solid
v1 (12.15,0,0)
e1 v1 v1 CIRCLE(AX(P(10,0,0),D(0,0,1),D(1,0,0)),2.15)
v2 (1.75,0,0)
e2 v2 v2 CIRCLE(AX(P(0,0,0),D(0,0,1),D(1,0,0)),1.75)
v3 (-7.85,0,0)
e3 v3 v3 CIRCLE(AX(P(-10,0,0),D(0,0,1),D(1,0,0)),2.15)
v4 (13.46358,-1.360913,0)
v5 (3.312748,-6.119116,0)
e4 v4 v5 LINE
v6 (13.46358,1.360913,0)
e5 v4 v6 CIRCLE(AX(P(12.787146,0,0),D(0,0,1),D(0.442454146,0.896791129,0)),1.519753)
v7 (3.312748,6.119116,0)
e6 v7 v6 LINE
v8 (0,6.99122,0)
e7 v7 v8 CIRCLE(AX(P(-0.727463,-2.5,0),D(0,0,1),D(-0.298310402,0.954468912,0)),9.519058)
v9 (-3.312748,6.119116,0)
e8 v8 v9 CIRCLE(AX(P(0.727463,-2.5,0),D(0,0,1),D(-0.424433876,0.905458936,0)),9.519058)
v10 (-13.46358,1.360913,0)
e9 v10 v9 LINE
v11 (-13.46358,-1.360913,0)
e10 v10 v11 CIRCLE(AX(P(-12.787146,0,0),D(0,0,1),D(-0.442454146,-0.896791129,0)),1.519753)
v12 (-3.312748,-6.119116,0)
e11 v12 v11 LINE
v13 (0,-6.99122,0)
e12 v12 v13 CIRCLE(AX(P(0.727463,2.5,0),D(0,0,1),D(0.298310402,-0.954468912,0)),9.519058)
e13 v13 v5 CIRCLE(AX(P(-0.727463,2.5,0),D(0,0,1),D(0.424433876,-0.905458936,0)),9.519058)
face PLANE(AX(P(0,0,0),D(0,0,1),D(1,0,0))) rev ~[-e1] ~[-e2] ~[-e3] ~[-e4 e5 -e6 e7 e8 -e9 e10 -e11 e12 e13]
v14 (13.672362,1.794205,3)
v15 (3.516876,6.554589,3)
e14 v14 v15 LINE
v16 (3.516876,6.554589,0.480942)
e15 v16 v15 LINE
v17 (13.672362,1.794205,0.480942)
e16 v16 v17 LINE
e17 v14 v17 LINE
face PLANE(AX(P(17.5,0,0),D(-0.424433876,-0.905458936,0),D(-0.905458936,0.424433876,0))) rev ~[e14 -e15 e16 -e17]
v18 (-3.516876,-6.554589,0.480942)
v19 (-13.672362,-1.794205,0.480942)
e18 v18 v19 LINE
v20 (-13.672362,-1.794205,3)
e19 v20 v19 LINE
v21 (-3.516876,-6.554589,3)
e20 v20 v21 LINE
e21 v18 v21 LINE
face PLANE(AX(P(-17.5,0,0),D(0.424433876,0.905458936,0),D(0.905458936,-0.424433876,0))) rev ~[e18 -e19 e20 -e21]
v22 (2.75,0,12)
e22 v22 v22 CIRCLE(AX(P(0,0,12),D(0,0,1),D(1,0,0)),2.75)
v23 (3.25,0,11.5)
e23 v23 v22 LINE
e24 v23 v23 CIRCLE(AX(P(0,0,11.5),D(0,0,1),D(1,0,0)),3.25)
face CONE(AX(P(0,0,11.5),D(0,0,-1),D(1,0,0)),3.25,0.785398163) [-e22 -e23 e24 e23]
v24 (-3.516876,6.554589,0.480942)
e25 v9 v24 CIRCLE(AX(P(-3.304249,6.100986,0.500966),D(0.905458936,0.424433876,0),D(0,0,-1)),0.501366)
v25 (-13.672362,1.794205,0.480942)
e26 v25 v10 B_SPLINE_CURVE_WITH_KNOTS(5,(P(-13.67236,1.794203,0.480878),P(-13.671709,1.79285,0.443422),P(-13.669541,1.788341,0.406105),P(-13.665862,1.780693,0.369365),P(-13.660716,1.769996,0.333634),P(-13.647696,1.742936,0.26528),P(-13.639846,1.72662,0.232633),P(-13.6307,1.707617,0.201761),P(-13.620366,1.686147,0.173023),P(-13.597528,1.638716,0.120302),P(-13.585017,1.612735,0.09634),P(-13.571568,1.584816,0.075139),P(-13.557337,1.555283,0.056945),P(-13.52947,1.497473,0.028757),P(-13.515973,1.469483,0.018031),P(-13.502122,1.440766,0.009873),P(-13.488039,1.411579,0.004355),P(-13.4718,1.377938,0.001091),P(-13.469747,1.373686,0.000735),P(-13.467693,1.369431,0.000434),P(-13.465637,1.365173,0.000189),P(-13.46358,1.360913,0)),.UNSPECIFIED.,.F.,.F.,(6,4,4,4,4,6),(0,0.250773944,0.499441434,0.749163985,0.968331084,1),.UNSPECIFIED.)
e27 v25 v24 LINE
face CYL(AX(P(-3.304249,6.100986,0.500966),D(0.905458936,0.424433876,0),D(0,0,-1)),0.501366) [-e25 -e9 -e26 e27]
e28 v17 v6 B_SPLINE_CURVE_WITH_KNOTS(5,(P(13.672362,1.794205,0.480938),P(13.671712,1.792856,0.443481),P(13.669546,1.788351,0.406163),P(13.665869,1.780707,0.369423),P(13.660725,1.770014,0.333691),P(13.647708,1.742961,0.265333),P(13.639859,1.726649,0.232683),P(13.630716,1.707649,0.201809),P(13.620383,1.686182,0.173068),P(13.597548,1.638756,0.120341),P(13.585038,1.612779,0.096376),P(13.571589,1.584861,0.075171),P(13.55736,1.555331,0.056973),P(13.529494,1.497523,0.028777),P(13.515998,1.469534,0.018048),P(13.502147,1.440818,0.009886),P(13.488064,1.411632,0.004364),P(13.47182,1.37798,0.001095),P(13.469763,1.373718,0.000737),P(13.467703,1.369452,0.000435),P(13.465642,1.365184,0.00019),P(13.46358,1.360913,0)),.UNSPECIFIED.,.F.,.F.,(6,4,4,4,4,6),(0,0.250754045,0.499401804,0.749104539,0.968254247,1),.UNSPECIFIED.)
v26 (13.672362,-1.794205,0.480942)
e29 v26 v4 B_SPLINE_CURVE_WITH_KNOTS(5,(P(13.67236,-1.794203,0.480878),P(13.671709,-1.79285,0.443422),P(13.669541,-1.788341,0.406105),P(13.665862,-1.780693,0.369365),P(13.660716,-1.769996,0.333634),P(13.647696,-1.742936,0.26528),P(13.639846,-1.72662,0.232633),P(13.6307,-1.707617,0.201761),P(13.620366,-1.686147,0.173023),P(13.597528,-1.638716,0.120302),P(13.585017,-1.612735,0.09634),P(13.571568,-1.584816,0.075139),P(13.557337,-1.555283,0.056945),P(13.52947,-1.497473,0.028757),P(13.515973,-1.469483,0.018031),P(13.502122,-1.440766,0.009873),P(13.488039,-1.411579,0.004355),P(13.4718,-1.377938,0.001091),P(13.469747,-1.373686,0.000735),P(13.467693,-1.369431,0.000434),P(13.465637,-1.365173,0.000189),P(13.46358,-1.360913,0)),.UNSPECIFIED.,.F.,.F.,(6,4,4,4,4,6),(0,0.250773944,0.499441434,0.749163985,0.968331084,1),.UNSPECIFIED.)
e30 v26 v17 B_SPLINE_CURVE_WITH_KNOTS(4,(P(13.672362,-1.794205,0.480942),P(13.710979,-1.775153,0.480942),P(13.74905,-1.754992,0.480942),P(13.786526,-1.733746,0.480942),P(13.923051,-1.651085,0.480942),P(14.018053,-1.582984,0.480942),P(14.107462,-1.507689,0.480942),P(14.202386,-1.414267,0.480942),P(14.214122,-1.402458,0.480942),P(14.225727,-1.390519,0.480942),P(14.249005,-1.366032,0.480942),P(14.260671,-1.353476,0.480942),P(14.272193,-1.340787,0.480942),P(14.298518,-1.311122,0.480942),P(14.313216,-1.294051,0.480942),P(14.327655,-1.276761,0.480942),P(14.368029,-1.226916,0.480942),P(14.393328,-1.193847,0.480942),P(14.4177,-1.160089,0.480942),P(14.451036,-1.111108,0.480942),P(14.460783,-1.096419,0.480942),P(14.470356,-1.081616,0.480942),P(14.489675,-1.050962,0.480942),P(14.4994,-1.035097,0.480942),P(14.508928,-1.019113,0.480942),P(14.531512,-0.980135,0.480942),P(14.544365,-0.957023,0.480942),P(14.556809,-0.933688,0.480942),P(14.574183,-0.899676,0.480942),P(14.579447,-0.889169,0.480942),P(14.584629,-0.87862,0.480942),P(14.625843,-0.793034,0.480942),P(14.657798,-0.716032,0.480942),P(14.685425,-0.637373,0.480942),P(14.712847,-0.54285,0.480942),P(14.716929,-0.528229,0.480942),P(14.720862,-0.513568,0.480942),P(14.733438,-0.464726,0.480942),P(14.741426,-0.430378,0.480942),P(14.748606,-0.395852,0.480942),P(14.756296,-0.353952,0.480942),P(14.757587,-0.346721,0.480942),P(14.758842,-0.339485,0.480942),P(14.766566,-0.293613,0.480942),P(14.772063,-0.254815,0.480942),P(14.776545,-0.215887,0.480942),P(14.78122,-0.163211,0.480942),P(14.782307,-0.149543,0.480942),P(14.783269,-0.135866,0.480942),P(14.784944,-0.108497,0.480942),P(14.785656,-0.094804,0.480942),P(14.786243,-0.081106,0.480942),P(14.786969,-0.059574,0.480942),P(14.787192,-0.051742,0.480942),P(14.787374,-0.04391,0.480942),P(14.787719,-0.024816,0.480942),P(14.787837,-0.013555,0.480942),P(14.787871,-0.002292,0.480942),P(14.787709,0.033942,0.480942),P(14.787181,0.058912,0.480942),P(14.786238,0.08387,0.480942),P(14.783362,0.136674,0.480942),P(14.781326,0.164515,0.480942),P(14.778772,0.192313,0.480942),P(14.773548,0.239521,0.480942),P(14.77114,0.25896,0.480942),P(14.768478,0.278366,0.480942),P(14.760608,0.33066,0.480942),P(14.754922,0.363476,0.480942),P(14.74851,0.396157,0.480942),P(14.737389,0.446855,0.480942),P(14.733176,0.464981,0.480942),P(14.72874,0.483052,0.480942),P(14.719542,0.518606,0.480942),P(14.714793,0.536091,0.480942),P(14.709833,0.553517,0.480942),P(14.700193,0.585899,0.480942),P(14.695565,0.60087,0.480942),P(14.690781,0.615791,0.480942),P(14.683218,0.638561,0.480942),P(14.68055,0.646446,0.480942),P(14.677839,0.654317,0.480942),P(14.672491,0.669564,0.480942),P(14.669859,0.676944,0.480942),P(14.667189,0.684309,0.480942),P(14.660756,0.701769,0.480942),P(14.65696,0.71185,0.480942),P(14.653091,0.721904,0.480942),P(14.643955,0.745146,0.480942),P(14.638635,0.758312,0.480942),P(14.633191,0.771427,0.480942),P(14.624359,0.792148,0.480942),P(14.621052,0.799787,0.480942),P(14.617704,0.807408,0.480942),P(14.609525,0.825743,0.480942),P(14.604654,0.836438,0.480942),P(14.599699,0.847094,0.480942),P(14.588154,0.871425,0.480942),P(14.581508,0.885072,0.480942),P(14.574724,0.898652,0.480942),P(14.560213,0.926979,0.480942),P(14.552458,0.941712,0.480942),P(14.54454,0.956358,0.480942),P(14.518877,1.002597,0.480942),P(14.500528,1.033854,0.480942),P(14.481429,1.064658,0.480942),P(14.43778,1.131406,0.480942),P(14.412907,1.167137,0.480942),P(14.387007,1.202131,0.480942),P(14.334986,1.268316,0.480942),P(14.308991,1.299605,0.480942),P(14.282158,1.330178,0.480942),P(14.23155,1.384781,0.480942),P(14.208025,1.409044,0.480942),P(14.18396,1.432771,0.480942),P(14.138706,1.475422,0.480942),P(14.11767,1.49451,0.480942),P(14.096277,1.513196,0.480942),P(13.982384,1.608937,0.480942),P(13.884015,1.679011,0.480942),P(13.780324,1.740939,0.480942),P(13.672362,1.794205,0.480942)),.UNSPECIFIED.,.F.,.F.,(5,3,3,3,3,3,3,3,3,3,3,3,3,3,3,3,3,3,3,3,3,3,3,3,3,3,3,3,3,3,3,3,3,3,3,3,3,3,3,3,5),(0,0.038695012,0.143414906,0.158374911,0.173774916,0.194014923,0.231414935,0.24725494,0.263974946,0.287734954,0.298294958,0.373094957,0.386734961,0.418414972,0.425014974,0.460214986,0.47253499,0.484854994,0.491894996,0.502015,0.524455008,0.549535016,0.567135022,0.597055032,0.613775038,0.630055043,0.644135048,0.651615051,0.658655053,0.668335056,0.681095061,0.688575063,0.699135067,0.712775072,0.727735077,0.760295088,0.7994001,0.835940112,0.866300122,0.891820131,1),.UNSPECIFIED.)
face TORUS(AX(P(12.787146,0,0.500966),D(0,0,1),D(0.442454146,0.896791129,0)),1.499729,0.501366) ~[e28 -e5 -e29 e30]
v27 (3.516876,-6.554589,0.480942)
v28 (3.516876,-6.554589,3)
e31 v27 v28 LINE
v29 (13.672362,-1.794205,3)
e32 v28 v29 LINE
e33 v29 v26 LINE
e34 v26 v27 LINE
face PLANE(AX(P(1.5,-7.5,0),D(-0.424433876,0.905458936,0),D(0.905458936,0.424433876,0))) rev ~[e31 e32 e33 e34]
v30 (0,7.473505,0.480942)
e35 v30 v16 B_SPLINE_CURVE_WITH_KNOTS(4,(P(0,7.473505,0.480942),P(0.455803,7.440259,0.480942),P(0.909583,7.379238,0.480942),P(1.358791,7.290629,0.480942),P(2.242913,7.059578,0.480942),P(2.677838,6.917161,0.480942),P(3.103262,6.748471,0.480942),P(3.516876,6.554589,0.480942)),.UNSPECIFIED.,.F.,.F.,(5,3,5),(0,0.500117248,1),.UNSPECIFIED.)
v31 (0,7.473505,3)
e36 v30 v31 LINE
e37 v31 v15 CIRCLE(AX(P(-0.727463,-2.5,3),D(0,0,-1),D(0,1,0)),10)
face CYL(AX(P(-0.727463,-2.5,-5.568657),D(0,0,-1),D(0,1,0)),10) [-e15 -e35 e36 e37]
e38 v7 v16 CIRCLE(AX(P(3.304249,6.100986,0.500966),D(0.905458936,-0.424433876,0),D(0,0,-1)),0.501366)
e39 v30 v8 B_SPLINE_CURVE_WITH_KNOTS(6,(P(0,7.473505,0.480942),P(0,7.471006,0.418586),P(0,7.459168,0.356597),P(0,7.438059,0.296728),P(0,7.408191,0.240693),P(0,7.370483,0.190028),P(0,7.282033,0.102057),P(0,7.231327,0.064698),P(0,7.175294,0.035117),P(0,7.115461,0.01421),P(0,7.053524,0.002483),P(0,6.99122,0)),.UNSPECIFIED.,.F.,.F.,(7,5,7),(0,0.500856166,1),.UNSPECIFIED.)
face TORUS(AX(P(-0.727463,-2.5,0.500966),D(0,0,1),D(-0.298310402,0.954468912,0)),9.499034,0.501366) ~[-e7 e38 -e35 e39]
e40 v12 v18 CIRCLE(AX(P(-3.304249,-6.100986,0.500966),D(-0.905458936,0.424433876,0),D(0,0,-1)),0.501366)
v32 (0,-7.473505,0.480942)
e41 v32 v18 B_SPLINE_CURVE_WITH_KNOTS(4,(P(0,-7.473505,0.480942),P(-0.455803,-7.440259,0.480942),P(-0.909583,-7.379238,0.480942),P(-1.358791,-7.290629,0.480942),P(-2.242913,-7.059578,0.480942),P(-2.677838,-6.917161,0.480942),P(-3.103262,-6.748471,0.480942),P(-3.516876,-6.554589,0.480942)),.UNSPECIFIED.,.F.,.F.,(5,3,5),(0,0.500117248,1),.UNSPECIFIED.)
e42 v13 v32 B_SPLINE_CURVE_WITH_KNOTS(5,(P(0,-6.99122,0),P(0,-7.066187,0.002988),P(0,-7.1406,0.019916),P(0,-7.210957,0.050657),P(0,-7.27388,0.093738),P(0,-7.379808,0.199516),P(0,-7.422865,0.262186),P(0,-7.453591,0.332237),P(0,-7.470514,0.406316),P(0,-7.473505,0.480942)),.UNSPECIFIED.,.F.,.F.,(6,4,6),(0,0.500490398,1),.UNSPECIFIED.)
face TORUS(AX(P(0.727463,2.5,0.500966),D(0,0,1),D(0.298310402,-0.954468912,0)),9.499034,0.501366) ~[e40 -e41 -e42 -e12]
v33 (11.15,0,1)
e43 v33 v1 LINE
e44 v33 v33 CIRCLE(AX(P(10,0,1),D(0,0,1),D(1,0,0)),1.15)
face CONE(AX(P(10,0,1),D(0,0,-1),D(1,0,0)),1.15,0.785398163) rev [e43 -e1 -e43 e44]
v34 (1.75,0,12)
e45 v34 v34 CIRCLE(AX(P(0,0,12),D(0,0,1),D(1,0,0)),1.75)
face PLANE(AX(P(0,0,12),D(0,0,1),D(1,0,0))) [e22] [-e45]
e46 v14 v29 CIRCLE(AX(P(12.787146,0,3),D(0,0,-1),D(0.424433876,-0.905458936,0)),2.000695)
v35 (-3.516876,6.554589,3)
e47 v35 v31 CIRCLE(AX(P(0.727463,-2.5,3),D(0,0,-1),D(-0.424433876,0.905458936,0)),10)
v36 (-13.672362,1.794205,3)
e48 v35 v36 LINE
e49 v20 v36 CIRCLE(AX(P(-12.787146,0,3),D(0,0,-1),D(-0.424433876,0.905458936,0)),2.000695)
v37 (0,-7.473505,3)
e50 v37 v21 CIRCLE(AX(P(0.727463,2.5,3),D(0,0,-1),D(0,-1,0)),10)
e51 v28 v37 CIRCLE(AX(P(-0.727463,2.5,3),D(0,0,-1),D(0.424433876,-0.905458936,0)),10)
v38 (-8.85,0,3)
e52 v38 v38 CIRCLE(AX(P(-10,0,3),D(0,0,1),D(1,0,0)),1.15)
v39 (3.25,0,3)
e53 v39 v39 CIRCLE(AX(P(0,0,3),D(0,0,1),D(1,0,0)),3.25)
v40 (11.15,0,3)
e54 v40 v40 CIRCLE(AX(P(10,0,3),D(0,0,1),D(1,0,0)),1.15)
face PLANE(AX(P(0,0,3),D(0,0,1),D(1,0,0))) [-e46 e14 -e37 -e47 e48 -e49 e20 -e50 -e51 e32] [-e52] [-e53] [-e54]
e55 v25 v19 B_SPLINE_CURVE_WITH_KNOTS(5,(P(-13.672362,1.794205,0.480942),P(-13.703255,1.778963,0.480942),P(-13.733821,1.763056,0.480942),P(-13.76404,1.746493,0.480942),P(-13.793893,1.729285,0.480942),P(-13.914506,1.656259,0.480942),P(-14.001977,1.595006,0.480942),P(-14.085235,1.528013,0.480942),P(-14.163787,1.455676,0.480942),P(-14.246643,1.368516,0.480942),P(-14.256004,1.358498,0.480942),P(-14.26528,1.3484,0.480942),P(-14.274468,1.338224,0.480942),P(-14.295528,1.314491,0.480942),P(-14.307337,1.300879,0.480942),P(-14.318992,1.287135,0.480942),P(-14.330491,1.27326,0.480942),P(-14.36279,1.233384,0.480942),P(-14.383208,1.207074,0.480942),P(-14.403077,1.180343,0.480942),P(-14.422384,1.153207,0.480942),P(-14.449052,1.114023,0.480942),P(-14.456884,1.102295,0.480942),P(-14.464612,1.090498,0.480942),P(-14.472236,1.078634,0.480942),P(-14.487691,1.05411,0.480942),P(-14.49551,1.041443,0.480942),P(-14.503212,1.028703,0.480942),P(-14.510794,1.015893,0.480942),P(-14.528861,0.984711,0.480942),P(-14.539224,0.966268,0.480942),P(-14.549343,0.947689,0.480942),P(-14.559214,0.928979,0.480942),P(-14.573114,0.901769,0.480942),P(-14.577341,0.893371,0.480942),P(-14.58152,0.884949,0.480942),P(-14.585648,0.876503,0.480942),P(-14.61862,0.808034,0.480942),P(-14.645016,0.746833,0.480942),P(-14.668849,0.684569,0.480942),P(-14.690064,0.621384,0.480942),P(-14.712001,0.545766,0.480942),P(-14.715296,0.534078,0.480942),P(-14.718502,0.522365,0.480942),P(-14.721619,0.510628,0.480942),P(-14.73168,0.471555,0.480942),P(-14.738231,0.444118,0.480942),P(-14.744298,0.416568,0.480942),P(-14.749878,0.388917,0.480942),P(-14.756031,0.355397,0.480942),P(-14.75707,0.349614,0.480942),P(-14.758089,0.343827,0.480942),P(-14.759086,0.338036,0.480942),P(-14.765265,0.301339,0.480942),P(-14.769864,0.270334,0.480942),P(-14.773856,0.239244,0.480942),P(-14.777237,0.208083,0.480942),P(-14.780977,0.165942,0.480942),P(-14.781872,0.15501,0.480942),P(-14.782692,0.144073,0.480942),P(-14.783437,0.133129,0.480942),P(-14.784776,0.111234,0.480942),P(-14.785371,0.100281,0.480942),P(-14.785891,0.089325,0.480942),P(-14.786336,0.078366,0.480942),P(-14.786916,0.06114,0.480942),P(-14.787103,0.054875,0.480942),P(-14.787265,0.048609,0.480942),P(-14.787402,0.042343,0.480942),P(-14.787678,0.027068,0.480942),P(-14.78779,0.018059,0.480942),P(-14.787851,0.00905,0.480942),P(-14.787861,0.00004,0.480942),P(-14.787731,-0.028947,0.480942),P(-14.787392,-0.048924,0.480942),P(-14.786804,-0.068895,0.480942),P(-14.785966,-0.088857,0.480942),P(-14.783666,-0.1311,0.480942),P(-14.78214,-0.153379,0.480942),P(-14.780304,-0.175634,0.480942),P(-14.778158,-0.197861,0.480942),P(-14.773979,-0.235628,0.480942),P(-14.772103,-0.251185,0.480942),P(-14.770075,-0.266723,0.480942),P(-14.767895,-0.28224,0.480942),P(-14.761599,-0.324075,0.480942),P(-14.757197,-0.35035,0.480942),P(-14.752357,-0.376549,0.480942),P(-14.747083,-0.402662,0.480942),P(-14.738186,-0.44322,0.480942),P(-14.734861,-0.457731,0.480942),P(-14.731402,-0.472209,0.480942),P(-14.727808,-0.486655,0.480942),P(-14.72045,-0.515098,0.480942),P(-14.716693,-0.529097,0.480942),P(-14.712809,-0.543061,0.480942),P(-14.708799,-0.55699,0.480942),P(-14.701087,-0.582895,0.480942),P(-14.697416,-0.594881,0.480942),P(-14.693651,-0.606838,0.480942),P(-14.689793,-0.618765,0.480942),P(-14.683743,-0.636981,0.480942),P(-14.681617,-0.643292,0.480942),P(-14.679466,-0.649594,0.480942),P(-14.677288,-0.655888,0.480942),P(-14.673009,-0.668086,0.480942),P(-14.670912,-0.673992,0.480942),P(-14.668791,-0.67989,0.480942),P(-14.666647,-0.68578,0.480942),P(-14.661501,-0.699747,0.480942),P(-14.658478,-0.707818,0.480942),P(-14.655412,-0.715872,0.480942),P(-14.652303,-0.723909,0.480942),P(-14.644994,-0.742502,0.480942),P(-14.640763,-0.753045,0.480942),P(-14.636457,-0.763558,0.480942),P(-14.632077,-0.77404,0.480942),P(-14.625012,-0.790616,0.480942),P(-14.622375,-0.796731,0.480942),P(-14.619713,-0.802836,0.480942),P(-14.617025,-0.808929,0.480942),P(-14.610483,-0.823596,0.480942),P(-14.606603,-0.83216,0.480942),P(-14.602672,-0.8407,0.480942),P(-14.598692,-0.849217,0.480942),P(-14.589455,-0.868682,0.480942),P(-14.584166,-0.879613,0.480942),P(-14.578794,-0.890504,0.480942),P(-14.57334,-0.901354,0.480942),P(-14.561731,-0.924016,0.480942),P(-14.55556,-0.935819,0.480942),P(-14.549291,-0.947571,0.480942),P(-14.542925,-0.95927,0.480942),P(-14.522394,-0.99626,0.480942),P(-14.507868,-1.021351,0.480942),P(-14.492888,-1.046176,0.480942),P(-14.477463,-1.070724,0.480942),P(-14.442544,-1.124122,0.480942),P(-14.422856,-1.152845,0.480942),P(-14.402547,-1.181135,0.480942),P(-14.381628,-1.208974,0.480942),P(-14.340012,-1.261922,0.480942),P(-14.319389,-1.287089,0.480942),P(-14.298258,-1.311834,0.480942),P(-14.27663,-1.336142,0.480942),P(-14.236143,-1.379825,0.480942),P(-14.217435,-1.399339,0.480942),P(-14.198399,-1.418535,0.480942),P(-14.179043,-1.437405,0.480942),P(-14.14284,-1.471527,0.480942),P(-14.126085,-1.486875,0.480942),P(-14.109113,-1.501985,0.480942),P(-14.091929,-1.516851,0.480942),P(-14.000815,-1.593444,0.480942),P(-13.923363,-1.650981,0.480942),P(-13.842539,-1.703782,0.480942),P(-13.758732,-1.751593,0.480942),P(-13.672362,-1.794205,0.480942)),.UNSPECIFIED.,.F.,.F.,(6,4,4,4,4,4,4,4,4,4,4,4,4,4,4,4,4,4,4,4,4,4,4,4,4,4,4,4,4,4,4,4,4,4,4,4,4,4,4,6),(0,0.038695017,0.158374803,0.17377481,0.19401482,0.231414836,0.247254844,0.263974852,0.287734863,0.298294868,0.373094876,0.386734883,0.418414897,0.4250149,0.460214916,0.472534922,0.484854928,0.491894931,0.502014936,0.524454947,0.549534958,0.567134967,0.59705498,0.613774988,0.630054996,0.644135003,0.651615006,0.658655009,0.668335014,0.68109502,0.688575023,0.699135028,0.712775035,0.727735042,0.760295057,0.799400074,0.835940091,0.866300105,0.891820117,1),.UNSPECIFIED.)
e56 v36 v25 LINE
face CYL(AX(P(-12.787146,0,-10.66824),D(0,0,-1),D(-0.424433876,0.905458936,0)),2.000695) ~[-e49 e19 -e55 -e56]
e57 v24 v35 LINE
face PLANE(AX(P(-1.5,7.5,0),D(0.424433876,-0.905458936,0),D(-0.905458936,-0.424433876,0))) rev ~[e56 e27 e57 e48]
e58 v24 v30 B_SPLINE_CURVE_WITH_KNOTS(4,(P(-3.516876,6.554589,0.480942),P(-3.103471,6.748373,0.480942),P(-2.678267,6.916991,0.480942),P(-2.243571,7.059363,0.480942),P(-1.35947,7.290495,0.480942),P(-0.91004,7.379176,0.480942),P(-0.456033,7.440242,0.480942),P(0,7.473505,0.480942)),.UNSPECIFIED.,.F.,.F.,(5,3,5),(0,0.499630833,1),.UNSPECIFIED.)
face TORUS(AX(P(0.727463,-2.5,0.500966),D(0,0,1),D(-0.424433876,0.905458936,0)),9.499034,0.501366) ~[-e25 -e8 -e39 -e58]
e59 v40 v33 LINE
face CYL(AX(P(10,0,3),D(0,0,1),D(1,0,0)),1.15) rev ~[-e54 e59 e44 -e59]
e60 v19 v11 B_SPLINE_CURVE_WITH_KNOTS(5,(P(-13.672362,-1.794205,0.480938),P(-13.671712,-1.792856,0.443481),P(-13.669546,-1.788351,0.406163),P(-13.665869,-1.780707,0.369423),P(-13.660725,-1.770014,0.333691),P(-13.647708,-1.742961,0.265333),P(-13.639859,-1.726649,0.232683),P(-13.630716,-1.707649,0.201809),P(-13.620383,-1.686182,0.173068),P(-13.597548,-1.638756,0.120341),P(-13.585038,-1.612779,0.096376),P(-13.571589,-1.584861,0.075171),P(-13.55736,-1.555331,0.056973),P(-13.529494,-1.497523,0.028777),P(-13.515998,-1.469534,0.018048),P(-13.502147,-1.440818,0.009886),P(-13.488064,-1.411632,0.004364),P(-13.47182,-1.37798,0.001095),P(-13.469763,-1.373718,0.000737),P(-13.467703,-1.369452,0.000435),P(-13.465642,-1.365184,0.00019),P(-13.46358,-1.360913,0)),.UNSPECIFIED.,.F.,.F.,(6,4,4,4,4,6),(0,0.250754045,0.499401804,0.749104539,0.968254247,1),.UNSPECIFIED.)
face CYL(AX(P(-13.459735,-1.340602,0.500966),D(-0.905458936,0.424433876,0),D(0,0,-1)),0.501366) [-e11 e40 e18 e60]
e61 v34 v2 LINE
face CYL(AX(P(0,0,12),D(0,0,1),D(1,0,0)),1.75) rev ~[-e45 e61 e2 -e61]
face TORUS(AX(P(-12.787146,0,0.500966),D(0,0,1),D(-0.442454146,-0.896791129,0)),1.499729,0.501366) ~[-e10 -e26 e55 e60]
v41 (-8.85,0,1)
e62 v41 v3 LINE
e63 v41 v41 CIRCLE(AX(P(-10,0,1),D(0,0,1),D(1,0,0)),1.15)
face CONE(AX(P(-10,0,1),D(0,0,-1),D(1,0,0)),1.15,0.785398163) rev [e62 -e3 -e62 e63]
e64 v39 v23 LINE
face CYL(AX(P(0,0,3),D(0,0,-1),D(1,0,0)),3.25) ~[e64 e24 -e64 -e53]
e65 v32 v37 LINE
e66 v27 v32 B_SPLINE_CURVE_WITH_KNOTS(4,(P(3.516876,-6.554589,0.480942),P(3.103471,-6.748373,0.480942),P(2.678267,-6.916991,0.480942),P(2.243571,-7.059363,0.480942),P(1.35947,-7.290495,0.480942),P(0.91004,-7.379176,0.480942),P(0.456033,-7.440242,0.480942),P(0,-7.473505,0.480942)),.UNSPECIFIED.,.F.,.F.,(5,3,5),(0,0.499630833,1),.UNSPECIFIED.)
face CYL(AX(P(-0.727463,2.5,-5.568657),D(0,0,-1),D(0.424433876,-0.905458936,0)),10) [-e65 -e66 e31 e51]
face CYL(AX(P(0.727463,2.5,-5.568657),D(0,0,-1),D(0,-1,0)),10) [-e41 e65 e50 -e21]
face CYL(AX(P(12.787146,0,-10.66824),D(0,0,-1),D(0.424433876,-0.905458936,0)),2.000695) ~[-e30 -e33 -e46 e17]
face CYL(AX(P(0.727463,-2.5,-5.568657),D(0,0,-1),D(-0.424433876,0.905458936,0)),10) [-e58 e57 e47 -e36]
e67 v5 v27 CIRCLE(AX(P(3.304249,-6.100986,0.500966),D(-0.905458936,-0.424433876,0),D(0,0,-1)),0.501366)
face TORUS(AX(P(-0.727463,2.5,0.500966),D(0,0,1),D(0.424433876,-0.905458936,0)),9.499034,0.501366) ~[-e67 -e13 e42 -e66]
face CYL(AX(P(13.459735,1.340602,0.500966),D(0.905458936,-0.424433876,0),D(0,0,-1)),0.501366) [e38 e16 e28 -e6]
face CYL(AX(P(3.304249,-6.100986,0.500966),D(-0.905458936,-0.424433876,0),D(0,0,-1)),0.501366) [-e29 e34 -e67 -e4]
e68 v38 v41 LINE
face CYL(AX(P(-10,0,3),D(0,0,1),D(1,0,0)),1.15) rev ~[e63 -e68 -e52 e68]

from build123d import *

# Parameters (mm, degrees)
F1_DEPTH      = 3
F2_T1_DEPTH   = 24.3364797517
F3_T1_DEPTH   = 14.1373136471
F4_R          = 3.25
F5_DEPTH      = 9
F6_R          = 1.75
F7_DEPTH      = 12.001
F8_SIZE       = 0.5
F4_R_2        = 1.15
F9_DEPTH      = 3.001
F10_SIZE      = 1
F11_T1_DEPTH  = 11.2158433332
F11_T3_DEPTH  = 11.2158433332
F11_T5_DEPTH  = 11.2158433332
F11_T7_DEPTH  = 11.2158433332
F11_T10_ANGLE = 127.4788590763
F11_T12_ANGLE = 42.4709850422
F11_T14_ANGLE = 42.4709850422
F11_T16_ANGLE = 42.4709850422
F11_T18_ANGLE = 42.4709850422
F11_T20_ANGLE = 127.4788590763


# Not quite as in the source:
# - a fillet or chamfer that OpenCascade refuses, or shapes differently, is made with other operations: its cross-section is extruded or revolved along the edge and cut away or added


with BuildPart() as f1:
    # F0 (on Top) → F1 (new body)
    with BuildSketch(Plane.XY):
        Polygon((-1.5, 7.5), (-17.5, 0), (-1.5, -7.5), (1.5, -7.5), (17.5, 0), (1.5, 7.5), align=None)
    extrude(amount=F1_DEPTH)

    # F2: fillet of radius 2 on 2 edges, made by hand

    # F2_s2 → F2_t1 (cut)
    with BuildSketch(Plane.XY.offset(-10.6682398759)):
        with BuildLine():
            ThreePointArc((-13.6363085399, 1.8115471368), (-14.7878407874, 0), (-13.6363085399, -1.8115471368))
            Line((-13.6363085399, -1.8115471368), (-13.7212248119, -1.9927018505))
            ThreePointArc((-13.7212248119, -1.9927018505), (-15.6529856552, -1.0867471903), (-17.584916272, -0.1811547137))
            Line((-17.584916272, -0.1811547137), (-17.584916272, 0.1811547137))
            ThreePointArc((-17.584916272, 0.1811547137), (-15.6529856552, 1.0867471903), (-13.7212248119, 1.9927018505))
            Line((-13.7212248119, 1.9927018505), (-13.6363085399, 1.8115471368))
        make_face()
        with BuildLine():
            ThreePointArc((13.6363085399, -1.8115471368), (14.7878407874, 0), (13.6363085399, 1.8115471368))
            Line((13.6363085399, 1.8115471368), (13.7212248119, 1.9927018505))
            ThreePointArc((13.7212248119, 1.9927018505), (15.6529856552, 1.0867471903), (17.584916272, 0.1811547137))
            Line((17.584916272, 0.1811547137), (17.584916272, -0.1811547137))
            ThreePointArc((17.584916272, -0.1811547137), (15.6529856552, -1.0867471903), (13.7212248119, -1.9927018505))
            Line((13.7212248119, -1.9927018505), (13.6363085399, -1.8115471368))
        make_face()
    extrude(amount=F2_T1_DEPTH, mode=Mode.SUBTRACT)

    # F3: fillet of radius 10 on 4 edges, made by hand

    # F3_s2 → F3_t1 (cut)
    with BuildSketch(Plane.XY.offset(-5.5686568236)):
        with BuildLine():
            ThreePointArc((-3.5168760329, 6.5545893596), (-1.4467160125, 7.2607861772), (0.7274627294, 7.5))
            Line((0.7274627294, 7.5), (-1.5, 7.5))
            Line((-1.5, 7.5), (-3.5168760329, 6.5545893596))
        make_face()
        with BuildLine():
            ThreePointArc((-0.7274627294, 7.5), (1.4467160125, 7.2607861772), (3.5168760329, 6.5545893596))
            Line((3.5168760329, 6.5545893596), (1.5, 7.5))
            Line((1.5, 7.5), (-0.7274627294, 7.5))
        make_face()
        with BuildLine():
            ThreePointArc((3.5168760329, -6.5545893596), (1.4467160125, -7.2607861772), (-0.7274627294, -7.5))
            Line((-0.7274627294, -7.5), (1.5, -7.5))
            Line((1.5, -7.5), (3.5168760329, -6.5545893596))
        make_face()
        with BuildLine():
            ThreePointArc((0.7274627294, -7.5), (-1.4467160125, -7.2607861772), (-3.5168760329, -6.5545893596))
            Line((-3.5168760329, -6.5545893596), (-1.5, -7.5))
            Line((-1.5, -7.5), (0.7274627294, -7.5))
        make_face()
    extrude(amount=F3_T1_DEPTH, mode=Mode.SUBTRACT)

    # F4 (on face) → F5 (join)
    with BuildSketch(Plane.XY.offset(3)):
        Circle(F4_R)
    extrude(amount=F5_DEPTH)

    # F6 (on face) → F7 (cut, through all)
    with BuildSketch(Plane.XY.offset(12)):
        Circle(F6_R)
    extrude(amount=-F7_DEPTH, mode=Mode.SUBTRACT)

    # F8
    f8_edges = [f1.edges().sort_by_distance(p)[0] for p in [
        (-3.25, 0, 12),
    ]]
    chamfer(f8_edges, length=F8_SIZE)

    # F4 (on face) → F9 (cut, through all)
    with BuildSketch(Plane.XY.offset(3)):
        with Locations((-10, 0)):
            Circle(F4_R_2)
        with Locations((10, 0)):
            Circle(F4_R_2)
    extrude(amount=-F9_DEPTH, mode=Mode.SUBTRACT)

    # F10
    f10_edges = [f1.edges().sort_by_distance(p)[0] for p in [
        (-11.15, 0, 0),
        (8.85, 0, 0),
    ]]
    chamfer(f10_edges, length=F10_SIZE)

    # F11: fillet of radius 0.5 on 10 edges, made by hand

    # F11_s2 → F11_t1 (cut)
    with BuildSketch(Plane(origin=(-10.5198395857, 4.9311748058, 0), x_dir=(0, 0, 1), z_dir=(0.905458936, -0.4244338762, 0))):
        with BuildLine():
            ThreePointArc((-0.0004, 6.9266271486), (0.1464466094, 7.2811462246), (0.5009656854, 7.427992834))
            Line((0.5009656854, 7.427992834), (0.5009656854, 7.4781294026))
            ThreePointArc((0.5009656854, 7.4781294026), (0.2504828427, 7.4777294026), (0, 7.4777294026))
            Line((0, 7.4777294026), (-0.0501365685, 7.427592834))
            ThreePointArc((-0.0501365685, 7.427592834), (-0.0501365685, 7.1771099913), (-0.0505365685, 6.9266271486))
            Line((-0.0505365685, 6.9266271486), (-0.0004, 6.9266271486))
        make_face()
    extrude(amount=F11_T1_DEPTH, mode=Mode.SUBTRACT)

    # F11_s4 → F11_t3 (cut)
    with BuildSketch(Plane(origin=(0.3643540153, 0.1707909447, 0), x_dir=(0, 0, 1), z_dir=(0.905458936, 0.4244338762, 0))):
        with BuildLine():
            ThreePointArc((-0.0004, 6.9266271486), (0.1464466094, 7.2811462246), (0.5009656854, 7.427992834))
            Line((0.5009656854, 7.427992834), (0.5009656854, 7.4781294026))
            ThreePointArc((0.5009656854, 7.4781294026), (0.2504828427, 7.4777294026), (0, 7.4777294026))
            Line((0, 7.4777294026), (-0.0501365685, 7.427592834))
            ThreePointArc((-0.0501365685, 7.427592834), (-0.0501365685, 7.1771099913), (-0.0505365685, 6.9266271486))
            Line((-0.0505365685, 6.9266271486), (-0.0004, 6.9266271486))
        make_face()
    extrude(amount=F11_T3_DEPTH, mode=Mode.SUBTRACT)

    # F11_s6 → F11_t5 (cut)
    with BuildSketch(Plane(origin=(10.5198395857, -4.9311748058, 0), x_dir=(0, 0, 1), z_dir=(-0.905458936, 0.4244338762, 0))):
        with BuildLine():
            ThreePointArc((-0.0004, 6.9266271486), (0.1464466094, 7.2811462246), (0.5009656854, 7.427992834))
            Line((0.5009656854, 7.427992834), (0.5009656854, 7.4781294026))
            ThreePointArc((0.5009656854, 7.4781294026), (0.2504828427, 7.4777294026), (0, 7.4777294026))
            Line((0, 7.4777294026), (-0.0501365685, 7.427592834))
            ThreePointArc((-0.0501365685, 7.427592834), (-0.0501365685, 7.1771099913), (-0.0505365685, 6.9266271486))
            Line((-0.0505365685, 6.9266271486), (-0.0004, 6.9266271486))
        make_face()
    extrude(amount=F11_T5_DEPTH, mode=Mode.SUBTRACT)

    # F11_s8 → F11_t7 (cut)
    with BuildSketch(Plane(origin=(-0.3643540153, -0.1707909447, 0), x_dir=(0, 0, 1), z_dir=(-0.905458936, -0.4244338762, 0))):
        with BuildLine():
            ThreePointArc((-0.0004, 6.9266271486), (0.1464466094, 7.2811462246), (0.5009656854, 7.427992834))
            Line((0.5009656854, 7.427992834), (0.5009656854, 7.4781294026))
            ThreePointArc((0.5009656854, 7.4781294026), (0.2504828427, 7.4777294026), (0, 7.4777294026))
            Line((0, 7.4777294026), (-0.0501365685, 7.427592834))
            ThreePointArc((-0.0501365685, 7.427592834), (-0.0501365685, 7.1771099913), (-0.0505365685, 6.9266271486))
            Line((-0.0505365685, 6.9266271486), (-0.0004, 6.9266271486))
        make_face()
    extrude(amount=F11_T7_DEPTH, mode=Mode.SUBTRACT)

    # F11_s9 → F11_t10 (revolve, cut)
    with BuildSketch(Plane(origin=(10.283861632, -5.0737982035, 0), x_dir=(0, 0, 1), z_dir=(-0.8967911287, 0.4424541462, 0))):
        with BuildLine():
            ThreePointArc((-0.0004, 7.157454968), (0.1464466094, 7.511974044), (0.5009656854, 7.6588206534))
            Line((0.5009656854, 7.6588206534), (0.5009656854, 7.708957222))
            ThreePointArc((0.5009656854, 7.708957222), (0.2504828427, 7.708557222), (0, 7.708557222))
            Line((0, 7.708557222), (-0.0501365685, 7.6584206534))
            ThreePointArc((-0.0501365685, 7.6584206534), (-0.0501365685, 7.4079378107), (-0.0505365685, 7.157454968))
            Line((-0.0505365685, 7.157454968), (-0.0004, 7.157454968))
        make_face()
    revolve(axis=Axis((12.7871458195, 0, 0), (0, 0, -1)), revolution_arc=F11_T10_ANGLE, mode=Mode.SUBTRACT)

    # F11_s11 → F11_t12 (revolve, cut)
    with BuildSketch(Plane(origin=(-1.3745464916, -0.429601751, 0), x_dir=(0, 0, 1), z_dir=(-0.9544689122, -0.2983104016, 0))):
        with BuildLine():
            ThreePointArc((-0.0004, 7.3298717335), (0.1464466094, 7.6843908095), (0.5009656854, 7.8312374189))
            Line((0.5009656854, 7.8312374189), (0.5009656854, 7.8813739874))
            ThreePointArc((0.5009656854, 7.8813739874), (0.2504828427, 7.8809739874), (0, 7.8809739874))
            Line((0, 7.8809739874), (-0.0501365685, 7.8308374189))
            ThreePointArc((-0.0501365685, 7.8308374189), (-0.0501365685, 7.5803545762), (-0.0505365685, 7.3298717335))
            Line((-0.0505365685, 7.3298717335), (-0.0004, 7.3298717335))
        make_face()
    revolve(axis=Axis((-0.72746273, -2.5000000027, 0), (0, 0, -1)), revolution_arc=F11_T12_ANGLE, mode=Mode.SUBTRACT)

    # F11_s13 → F11_t14 (revolve, cut)
    with BuildSketch(Plane(origin=(-0.3643540157, -0.1707909448, 0), x_dir=(0, 0, 1), z_dir=(-0.905458936, -0.4244338762, 0))):
        with BuildLine():
            ThreePointArc((-0.0004, 6.9266271486), (0.1464466094, 7.2811462246), (0.5009656854, 7.427992834))
            Line((0.5009656854, 7.427992834), (0.5009656854, 7.4781294026))
            ThreePointArc((0.5009656854, 7.4781294026), (0.2504828427, 7.4777294026), (0, 7.4777294026))
            Line((0, 7.4777294026), (-0.0501365685, 7.427592834))
            ThreePointArc((-0.0501365685, 7.427592834), (-0.0501365685, 7.1771099913), (-0.0505365685, 6.9266271486))
            Line((-0.0505365685, 6.9266271486), (-0.0004, 6.9266271486))
        make_face()
    revolve(axis=Axis((0.72746273, -2.5000000027, 0), (0, 0, -1)), revolution_arc=F11_T14_ANGLE, mode=Mode.SUBTRACT)

    # F11_s15 → F11_t16 (revolve, cut)
    with BuildSketch(Plane(origin=(0.3643540157, 0.1707909448, 0), x_dir=(0, 0, 1), z_dir=(0.905458936, 0.4244338762, 0))):
        with BuildLine():
            ThreePointArc((-0.0004, 6.9266271486), (0.1464466094, 7.2811462246), (0.5009656854, 7.427992834))
            Line((0.5009656854, 7.427992834), (0.5009656854, 7.4781294026))
            ThreePointArc((0.5009656854, 7.4781294026), (0.2504828427, 7.4777294026), (0, 7.4777294026))
            Line((0, 7.4777294026), (-0.0501365685, 7.427592834))
            ThreePointArc((-0.0501365685, 7.427592834), (-0.0501365685, 7.1771099913), (-0.0505365685, 6.9266271486))
            Line((-0.0505365685, 6.9266271486), (-0.0004, 6.9266271486))
        make_face()
    revolve(axis=Axis((-0.72746273, 2.5000000027, 0), (0, 0, -1)), revolution_arc=F11_T16_ANGLE, mode=Mode.SUBTRACT)

    # F11_s17 → F11_t18 (revolve, cut)
    with BuildSketch(Plane(origin=(1.3745464916, 0.429601751, 0), x_dir=(0, 0, 1), z_dir=(0.9544689122, 0.2983104016, 0))):
        with BuildLine():
            ThreePointArc((-0.0004, 7.3298717335), (0.1464466094, 7.6843908095), (0.5009656854, 7.8312374189))
            Line((0.5009656854, 7.8312374189), (0.5009656854, 7.8813739874))
            ThreePointArc((0.5009656854, 7.8813739874), (0.2504828427, 7.8809739874), (0, 7.8809739874))
            Line((0, 7.8809739874), (-0.0501365685, 7.8308374189))
            ThreePointArc((-0.0501365685, 7.8308374189), (-0.0501365685, 7.5803545762), (-0.0505365685, 7.3298717335))
            Line((-0.0505365685, 7.3298717335), (-0.0004, 7.3298717335))
        make_face()
    revolve(axis=Axis((0.72746273, 2.5000000027, 0), (0, 0, -1)), revolution_arc=F11_T18_ANGLE, mode=Mode.SUBTRACT)

    # F11_s19 → F11_t20 (revolve, cut)
    with BuildSketch(Plane(origin=(-10.283861632, 5.0737982035, 0), x_dir=(0, 0, 1), z_dir=(0.8967911287, -0.4424541462, 0))):
        with BuildLine():
            ThreePointArc((-0.0004, 7.157454968), (0.1464466094, 7.511974044), (0.5009656854, 7.6588206534))
            Line((0.5009656854, 7.6588206534), (0.5009656854, 7.708957222))
            ThreePointArc((0.5009656854, 7.708957222), (0.2504828427, 7.708557222), (0, 7.708557222))
            Line((0, 7.708557222), (-0.0501365685, 7.6584206534))
            ThreePointArc((-0.0501365685, 7.6584206534), (-0.0501365685, 7.4079378107), (-0.0505365685, 7.157454968))
            Line((-0.0505365685, 7.157454968), (-0.0004, 7.157454968))
        make_face()
    revolve(axis=Axis((-12.7871458195, 0, 0), (0, 0, -1)), revolution_arc=F11_T20_ANGLE, mode=Mode.SUBTRACT)


solid = f1.part
